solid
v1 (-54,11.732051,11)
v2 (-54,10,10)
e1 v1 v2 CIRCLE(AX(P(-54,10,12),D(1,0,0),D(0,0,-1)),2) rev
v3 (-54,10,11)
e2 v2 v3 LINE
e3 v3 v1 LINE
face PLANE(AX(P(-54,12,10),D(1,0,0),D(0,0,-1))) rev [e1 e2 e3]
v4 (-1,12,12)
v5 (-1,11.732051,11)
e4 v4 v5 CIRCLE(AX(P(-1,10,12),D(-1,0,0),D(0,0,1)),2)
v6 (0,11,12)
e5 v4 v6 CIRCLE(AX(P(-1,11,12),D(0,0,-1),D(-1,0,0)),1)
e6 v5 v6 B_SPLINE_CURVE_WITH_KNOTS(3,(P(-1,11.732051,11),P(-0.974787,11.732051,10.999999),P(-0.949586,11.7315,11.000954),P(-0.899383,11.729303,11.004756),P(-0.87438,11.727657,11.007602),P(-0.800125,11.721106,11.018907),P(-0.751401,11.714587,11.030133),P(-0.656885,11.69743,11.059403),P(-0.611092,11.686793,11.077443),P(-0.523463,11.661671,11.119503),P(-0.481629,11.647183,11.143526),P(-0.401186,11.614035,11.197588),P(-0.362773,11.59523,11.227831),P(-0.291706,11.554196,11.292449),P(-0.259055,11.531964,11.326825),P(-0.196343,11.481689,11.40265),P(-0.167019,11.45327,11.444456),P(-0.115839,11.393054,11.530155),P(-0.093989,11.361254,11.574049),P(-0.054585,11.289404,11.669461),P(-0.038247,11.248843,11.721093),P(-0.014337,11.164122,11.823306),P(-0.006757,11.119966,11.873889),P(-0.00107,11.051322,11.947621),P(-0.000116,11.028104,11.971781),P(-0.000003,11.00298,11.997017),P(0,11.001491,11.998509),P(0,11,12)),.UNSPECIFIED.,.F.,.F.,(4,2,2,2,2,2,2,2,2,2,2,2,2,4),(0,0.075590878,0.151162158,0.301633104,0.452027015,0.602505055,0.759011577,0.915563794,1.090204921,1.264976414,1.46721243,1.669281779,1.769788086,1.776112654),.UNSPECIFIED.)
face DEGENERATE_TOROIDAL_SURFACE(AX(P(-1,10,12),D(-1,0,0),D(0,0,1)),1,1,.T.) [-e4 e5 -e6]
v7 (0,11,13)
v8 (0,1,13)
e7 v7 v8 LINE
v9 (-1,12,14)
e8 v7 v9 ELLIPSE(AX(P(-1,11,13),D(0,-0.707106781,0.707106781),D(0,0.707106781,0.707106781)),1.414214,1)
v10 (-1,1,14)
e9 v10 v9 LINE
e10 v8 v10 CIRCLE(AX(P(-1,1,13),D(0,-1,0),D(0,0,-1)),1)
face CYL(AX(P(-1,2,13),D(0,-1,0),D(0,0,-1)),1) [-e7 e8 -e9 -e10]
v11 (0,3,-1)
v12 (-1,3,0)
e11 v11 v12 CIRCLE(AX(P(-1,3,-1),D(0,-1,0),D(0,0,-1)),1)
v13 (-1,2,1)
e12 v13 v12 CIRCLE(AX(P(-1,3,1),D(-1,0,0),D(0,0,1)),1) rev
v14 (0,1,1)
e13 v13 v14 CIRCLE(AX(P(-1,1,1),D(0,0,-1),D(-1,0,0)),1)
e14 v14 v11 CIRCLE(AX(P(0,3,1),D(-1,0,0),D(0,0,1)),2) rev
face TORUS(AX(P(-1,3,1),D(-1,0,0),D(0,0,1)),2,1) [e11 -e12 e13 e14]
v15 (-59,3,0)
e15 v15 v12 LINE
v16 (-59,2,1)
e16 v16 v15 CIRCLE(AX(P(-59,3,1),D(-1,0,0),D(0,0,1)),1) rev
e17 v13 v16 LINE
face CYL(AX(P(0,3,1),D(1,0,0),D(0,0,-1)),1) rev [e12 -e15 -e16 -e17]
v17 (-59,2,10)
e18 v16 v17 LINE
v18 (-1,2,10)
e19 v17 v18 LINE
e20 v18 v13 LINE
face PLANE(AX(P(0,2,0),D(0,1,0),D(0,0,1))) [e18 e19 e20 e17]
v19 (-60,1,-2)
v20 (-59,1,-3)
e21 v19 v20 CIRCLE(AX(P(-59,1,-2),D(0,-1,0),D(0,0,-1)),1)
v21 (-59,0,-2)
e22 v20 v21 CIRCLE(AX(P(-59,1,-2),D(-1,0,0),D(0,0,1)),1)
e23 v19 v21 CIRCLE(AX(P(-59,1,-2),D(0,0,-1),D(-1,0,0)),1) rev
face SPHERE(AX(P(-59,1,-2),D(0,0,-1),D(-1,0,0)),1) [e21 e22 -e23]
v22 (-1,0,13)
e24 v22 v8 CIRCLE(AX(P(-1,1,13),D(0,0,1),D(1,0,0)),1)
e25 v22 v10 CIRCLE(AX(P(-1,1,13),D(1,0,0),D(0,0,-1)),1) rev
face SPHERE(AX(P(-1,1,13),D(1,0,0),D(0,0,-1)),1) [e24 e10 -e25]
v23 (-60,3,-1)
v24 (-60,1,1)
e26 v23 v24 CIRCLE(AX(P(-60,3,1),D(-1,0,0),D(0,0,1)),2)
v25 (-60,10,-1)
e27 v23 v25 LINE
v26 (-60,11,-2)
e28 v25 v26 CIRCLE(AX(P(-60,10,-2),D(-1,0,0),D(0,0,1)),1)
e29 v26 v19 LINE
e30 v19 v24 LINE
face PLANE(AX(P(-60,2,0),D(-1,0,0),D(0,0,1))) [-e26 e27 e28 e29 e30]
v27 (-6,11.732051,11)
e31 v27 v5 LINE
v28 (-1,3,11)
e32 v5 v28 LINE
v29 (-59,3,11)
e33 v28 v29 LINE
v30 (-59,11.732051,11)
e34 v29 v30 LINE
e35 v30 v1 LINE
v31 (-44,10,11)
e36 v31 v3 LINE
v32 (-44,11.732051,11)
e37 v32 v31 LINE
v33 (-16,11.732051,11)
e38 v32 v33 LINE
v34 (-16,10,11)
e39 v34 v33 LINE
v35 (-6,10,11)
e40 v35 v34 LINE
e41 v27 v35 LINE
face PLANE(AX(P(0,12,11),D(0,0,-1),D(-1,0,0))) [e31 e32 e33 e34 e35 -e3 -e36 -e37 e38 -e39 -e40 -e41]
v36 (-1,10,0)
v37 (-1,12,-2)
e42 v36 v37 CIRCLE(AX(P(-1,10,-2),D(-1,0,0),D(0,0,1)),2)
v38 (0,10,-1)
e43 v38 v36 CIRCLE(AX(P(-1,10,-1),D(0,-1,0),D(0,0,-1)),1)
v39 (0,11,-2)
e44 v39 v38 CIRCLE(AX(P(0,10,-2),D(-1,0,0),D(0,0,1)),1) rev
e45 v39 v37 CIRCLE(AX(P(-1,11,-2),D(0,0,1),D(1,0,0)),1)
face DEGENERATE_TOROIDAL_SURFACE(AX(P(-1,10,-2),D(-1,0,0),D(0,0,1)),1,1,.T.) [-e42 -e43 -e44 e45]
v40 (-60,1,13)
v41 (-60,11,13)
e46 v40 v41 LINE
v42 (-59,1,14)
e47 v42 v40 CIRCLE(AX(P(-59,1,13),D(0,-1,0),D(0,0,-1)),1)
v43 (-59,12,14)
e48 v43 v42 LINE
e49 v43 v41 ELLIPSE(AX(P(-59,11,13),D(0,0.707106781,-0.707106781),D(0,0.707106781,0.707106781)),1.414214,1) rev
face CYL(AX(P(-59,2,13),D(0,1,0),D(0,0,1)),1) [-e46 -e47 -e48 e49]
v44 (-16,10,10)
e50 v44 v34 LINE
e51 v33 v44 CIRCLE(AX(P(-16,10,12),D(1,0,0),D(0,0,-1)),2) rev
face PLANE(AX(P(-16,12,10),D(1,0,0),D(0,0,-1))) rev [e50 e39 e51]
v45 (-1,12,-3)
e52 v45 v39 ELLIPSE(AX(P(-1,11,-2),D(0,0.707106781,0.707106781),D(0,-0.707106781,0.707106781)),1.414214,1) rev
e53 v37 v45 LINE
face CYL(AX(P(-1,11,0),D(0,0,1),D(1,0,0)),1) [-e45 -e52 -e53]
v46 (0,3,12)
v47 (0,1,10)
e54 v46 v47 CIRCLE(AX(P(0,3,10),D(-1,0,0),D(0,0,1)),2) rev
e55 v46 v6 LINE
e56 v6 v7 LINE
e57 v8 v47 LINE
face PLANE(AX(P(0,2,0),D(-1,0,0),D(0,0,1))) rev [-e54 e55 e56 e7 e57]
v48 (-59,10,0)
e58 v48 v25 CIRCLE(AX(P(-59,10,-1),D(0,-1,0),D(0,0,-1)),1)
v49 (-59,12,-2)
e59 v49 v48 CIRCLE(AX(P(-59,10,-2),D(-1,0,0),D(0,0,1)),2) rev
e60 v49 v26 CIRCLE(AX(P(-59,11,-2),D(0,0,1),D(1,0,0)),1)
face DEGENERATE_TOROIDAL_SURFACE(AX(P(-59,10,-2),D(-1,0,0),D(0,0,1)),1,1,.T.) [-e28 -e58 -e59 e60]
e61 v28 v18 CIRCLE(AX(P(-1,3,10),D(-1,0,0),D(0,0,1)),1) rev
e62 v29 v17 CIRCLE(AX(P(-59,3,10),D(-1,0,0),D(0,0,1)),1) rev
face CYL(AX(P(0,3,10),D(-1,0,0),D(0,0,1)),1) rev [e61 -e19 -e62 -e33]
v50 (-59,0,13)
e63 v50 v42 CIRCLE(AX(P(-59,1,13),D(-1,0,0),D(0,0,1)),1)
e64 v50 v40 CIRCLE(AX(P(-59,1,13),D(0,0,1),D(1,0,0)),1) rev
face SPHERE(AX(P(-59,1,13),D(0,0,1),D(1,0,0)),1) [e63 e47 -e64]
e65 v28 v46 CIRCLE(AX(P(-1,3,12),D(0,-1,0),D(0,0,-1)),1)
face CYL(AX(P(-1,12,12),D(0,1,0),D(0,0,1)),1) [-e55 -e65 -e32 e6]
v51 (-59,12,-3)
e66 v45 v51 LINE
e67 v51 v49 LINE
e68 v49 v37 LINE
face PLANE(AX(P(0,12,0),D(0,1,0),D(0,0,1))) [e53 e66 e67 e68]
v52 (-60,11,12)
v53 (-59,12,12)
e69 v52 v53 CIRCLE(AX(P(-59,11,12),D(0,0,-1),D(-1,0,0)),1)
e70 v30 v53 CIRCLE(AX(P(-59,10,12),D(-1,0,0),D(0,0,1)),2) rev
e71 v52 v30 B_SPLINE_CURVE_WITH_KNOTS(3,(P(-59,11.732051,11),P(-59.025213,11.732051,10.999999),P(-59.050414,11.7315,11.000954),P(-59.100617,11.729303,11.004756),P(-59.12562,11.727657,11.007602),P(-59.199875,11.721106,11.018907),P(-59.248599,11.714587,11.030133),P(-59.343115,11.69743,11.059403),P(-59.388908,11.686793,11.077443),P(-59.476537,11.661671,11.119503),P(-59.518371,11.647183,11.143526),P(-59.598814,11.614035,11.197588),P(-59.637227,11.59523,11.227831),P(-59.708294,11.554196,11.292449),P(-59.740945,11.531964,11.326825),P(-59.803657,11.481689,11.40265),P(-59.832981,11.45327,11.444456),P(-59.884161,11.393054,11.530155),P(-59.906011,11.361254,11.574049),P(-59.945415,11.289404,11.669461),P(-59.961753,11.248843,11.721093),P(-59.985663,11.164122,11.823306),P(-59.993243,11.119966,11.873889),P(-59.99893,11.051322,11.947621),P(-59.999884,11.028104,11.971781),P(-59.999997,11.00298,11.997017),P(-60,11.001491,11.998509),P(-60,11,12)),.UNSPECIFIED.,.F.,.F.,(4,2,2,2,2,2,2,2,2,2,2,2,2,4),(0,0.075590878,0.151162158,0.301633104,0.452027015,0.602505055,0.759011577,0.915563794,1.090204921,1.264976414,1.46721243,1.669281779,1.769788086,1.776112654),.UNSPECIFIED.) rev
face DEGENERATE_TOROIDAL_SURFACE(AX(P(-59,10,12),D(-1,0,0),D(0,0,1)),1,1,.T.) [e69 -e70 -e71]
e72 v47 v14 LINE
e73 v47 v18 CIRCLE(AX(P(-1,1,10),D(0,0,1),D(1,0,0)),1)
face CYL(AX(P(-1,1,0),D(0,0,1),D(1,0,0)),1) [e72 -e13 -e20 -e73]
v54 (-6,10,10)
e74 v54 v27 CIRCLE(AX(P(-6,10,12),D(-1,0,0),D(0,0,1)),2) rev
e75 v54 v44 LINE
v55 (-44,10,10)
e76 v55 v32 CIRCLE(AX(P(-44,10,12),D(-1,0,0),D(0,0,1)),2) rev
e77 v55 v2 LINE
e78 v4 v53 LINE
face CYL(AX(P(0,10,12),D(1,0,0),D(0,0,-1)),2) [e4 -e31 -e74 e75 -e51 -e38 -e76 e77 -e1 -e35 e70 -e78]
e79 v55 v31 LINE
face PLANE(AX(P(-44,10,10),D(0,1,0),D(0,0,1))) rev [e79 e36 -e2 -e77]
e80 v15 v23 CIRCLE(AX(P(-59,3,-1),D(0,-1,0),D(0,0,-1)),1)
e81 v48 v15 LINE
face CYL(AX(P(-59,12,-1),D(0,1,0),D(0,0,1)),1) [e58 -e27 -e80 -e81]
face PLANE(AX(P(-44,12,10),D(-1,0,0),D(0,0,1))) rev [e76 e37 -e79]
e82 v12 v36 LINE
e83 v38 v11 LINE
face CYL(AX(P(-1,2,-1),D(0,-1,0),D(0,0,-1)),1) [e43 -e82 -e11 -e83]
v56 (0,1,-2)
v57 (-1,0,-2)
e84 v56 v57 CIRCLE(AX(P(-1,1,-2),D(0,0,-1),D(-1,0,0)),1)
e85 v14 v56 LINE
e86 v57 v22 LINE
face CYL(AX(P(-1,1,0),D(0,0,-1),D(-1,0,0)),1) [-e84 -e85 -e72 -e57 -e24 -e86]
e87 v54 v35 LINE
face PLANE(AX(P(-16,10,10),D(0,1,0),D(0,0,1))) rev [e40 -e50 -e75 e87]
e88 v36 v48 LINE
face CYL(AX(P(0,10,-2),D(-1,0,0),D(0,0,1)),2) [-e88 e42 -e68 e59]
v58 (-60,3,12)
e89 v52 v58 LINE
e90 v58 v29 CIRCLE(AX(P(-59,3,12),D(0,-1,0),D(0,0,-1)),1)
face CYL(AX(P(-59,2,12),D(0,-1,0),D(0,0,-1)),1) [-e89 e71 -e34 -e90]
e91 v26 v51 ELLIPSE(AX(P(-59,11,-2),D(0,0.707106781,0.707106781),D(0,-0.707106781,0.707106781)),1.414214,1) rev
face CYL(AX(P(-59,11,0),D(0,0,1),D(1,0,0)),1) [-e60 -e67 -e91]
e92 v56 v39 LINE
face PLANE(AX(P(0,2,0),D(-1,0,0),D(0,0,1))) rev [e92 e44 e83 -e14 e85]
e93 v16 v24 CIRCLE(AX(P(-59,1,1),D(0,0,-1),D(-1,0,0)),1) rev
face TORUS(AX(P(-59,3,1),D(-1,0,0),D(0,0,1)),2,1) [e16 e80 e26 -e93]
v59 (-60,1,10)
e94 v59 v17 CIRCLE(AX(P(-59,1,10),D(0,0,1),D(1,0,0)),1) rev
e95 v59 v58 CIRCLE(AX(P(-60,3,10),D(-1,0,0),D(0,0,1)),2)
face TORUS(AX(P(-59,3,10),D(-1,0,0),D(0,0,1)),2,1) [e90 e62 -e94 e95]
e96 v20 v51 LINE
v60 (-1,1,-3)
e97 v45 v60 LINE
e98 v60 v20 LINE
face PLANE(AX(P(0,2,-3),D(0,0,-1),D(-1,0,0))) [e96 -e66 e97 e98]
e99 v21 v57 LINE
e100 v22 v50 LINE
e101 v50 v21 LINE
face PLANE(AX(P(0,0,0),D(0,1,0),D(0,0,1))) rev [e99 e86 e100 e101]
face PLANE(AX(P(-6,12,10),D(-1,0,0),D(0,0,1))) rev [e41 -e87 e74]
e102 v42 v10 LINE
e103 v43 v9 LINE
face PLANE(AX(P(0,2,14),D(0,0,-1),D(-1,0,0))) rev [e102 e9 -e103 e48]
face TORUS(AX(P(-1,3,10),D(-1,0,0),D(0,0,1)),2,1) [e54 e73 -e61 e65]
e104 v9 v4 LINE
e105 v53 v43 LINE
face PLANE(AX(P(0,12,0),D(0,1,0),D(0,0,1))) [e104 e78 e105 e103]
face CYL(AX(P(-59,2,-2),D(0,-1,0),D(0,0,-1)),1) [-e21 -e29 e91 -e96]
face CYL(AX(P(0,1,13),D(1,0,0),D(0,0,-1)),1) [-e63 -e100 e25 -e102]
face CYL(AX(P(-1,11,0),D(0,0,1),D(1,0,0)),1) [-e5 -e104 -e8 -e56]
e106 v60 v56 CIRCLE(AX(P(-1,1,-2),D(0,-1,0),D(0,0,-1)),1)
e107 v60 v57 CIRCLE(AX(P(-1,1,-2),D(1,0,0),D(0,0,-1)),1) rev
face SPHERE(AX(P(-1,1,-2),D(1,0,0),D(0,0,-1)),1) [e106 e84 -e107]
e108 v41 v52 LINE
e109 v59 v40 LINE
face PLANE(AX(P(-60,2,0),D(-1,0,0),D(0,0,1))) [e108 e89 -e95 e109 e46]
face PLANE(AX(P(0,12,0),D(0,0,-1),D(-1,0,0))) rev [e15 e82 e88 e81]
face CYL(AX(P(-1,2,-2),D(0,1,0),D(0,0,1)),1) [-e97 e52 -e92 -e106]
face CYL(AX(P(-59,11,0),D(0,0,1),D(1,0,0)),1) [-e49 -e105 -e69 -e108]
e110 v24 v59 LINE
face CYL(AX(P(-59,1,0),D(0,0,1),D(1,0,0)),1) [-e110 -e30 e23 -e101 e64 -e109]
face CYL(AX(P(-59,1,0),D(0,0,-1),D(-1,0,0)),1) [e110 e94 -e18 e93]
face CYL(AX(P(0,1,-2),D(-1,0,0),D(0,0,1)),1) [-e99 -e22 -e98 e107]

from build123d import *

# Parameters (mm, degrees)
SKETCH2_W           = 60
SKETCH2_H           = 3
SKETCH2_H_2         = 11
BOSS_EXTRUDE2_DEPTH = 2
SKETCH3_W           = 60
SKETCH3_H           = 3
BOSS_EXTRUDE3_DEPTH = 10
SKETCH4_W           = 10
SKETCH4_H           = 2
BOSS_EXTRUDE4_DEPTH = 1
FILLET1_START       = -61
FILLET1_DEPTH       = 62
FILLET2_R           = 1


with BuildPart() as part:
    # Sketch2 → Boss-Extrude2 (new body)
    with BuildSketch(Plane(origin=(0, 0, 0), x_dir=(1, 0, 0), z_dir=(0, 1, 0))):
        with Locations((-30, 1.5)):
            Rectangle(SKETCH2_W, SKETCH2_H)
        with Locations((-30, -5.5)):
            Rectangle(SKETCH2_W, SKETCH2_H_2)
        with Locations((-30, -12.5)):
            Rectangle(SKETCH2_W, SKETCH2_H)
    extrude(amount=BOSS_EXTRUDE2_DEPTH)

    # Sketch3 → Boss-Extrude3 (add)
    with BuildSketch(Plane(origin=(0, 2, 0), x_dir=(1, 0, 0), z_dir=(0, 1, 0))):
        with Locations((-30, -12.5)):
            Rectangle(SKETCH3_W, SKETCH3_H)
        with Locations((-30, 1.5)):
            Rectangle(SKETCH3_W, SKETCH3_H)
    extrude(amount=BOSS_EXTRUDE3_DEPTH)

    # Sketch4 → Boss-Extrude4 (add)
    with BuildSketch(Plane(origin=(0, 0, 11), x_dir=(-1, 0, 0), z_dir=(0, 0, -1))):
        with Locations((49, 11)):
            Rectangle(SKETCH4_W, SKETCH4_H)
        with Locations((11, 11)):
            Rectangle(SKETCH4_W, SKETCH4_H)
    extrude(amount=BOSS_EXTRUDE4_DEPTH)

    # Fillet1: read off the stored shape, not the designer's step
    # Fillet1 outline → Fillet1 (cut)
    with BuildSketch(Plane.YZ.offset(FILLET1_START)):
        with BuildLine():
            Line((12, 0), (10, 0))
            ThreePointArc((10, 0), (11.414213562, -0.585786438), (12, -2))
            Line((12, -2), (12, 0))
        make_face()
        with BuildLine():
            ThreePointArc((12, 12), (11.414213562, 10.585786438), (10, 10))
            Line((10, 10), (12, 10))
            Line((12, 10), (12, 12))
        make_face()
    extrude(amount=FILLET1_DEPTH, mode=Mode.SUBTRACT)

    # Fillet2
    fillet2_edges = [part.edges().sort_by_distance(p)[0] for p in [
        (-60, 6, -3),
        (0, 6, -3),
        (0, 6, 14),
        (-60, 6, 14),
        (-60, 2, 5.5),
        (0, 2, 5.5),
        (0, 12, 13),
        (-30, 2, 11),
        (-30, 2, 0),
        (-60, 12, -2.5),
        (-30, 0, -3),
        (0, 0, 5.5),
        (0, 12, -2.5),
        (0, 6, 0),
        (0, 6.866025404, 11),
        (0, 11.931851652, 11.48236191),
        (0, 11.414213562, -0.585786438),
        (-60, 6, 0),
        (-30, 0, 14),
        (-60, 12, 13),
        (-60, 6.866025404, 11),
        (-60, 11.931851652, 11.48236191),
        (-60, 11.414213562, -0.585786438),
        (-60, 0, 5.5),
    ]]
    fillet(fillet2_edges, radius=FILLET2_R - 0.0001)  # a hair under: the kernel refuses the full size


solid = part.part
